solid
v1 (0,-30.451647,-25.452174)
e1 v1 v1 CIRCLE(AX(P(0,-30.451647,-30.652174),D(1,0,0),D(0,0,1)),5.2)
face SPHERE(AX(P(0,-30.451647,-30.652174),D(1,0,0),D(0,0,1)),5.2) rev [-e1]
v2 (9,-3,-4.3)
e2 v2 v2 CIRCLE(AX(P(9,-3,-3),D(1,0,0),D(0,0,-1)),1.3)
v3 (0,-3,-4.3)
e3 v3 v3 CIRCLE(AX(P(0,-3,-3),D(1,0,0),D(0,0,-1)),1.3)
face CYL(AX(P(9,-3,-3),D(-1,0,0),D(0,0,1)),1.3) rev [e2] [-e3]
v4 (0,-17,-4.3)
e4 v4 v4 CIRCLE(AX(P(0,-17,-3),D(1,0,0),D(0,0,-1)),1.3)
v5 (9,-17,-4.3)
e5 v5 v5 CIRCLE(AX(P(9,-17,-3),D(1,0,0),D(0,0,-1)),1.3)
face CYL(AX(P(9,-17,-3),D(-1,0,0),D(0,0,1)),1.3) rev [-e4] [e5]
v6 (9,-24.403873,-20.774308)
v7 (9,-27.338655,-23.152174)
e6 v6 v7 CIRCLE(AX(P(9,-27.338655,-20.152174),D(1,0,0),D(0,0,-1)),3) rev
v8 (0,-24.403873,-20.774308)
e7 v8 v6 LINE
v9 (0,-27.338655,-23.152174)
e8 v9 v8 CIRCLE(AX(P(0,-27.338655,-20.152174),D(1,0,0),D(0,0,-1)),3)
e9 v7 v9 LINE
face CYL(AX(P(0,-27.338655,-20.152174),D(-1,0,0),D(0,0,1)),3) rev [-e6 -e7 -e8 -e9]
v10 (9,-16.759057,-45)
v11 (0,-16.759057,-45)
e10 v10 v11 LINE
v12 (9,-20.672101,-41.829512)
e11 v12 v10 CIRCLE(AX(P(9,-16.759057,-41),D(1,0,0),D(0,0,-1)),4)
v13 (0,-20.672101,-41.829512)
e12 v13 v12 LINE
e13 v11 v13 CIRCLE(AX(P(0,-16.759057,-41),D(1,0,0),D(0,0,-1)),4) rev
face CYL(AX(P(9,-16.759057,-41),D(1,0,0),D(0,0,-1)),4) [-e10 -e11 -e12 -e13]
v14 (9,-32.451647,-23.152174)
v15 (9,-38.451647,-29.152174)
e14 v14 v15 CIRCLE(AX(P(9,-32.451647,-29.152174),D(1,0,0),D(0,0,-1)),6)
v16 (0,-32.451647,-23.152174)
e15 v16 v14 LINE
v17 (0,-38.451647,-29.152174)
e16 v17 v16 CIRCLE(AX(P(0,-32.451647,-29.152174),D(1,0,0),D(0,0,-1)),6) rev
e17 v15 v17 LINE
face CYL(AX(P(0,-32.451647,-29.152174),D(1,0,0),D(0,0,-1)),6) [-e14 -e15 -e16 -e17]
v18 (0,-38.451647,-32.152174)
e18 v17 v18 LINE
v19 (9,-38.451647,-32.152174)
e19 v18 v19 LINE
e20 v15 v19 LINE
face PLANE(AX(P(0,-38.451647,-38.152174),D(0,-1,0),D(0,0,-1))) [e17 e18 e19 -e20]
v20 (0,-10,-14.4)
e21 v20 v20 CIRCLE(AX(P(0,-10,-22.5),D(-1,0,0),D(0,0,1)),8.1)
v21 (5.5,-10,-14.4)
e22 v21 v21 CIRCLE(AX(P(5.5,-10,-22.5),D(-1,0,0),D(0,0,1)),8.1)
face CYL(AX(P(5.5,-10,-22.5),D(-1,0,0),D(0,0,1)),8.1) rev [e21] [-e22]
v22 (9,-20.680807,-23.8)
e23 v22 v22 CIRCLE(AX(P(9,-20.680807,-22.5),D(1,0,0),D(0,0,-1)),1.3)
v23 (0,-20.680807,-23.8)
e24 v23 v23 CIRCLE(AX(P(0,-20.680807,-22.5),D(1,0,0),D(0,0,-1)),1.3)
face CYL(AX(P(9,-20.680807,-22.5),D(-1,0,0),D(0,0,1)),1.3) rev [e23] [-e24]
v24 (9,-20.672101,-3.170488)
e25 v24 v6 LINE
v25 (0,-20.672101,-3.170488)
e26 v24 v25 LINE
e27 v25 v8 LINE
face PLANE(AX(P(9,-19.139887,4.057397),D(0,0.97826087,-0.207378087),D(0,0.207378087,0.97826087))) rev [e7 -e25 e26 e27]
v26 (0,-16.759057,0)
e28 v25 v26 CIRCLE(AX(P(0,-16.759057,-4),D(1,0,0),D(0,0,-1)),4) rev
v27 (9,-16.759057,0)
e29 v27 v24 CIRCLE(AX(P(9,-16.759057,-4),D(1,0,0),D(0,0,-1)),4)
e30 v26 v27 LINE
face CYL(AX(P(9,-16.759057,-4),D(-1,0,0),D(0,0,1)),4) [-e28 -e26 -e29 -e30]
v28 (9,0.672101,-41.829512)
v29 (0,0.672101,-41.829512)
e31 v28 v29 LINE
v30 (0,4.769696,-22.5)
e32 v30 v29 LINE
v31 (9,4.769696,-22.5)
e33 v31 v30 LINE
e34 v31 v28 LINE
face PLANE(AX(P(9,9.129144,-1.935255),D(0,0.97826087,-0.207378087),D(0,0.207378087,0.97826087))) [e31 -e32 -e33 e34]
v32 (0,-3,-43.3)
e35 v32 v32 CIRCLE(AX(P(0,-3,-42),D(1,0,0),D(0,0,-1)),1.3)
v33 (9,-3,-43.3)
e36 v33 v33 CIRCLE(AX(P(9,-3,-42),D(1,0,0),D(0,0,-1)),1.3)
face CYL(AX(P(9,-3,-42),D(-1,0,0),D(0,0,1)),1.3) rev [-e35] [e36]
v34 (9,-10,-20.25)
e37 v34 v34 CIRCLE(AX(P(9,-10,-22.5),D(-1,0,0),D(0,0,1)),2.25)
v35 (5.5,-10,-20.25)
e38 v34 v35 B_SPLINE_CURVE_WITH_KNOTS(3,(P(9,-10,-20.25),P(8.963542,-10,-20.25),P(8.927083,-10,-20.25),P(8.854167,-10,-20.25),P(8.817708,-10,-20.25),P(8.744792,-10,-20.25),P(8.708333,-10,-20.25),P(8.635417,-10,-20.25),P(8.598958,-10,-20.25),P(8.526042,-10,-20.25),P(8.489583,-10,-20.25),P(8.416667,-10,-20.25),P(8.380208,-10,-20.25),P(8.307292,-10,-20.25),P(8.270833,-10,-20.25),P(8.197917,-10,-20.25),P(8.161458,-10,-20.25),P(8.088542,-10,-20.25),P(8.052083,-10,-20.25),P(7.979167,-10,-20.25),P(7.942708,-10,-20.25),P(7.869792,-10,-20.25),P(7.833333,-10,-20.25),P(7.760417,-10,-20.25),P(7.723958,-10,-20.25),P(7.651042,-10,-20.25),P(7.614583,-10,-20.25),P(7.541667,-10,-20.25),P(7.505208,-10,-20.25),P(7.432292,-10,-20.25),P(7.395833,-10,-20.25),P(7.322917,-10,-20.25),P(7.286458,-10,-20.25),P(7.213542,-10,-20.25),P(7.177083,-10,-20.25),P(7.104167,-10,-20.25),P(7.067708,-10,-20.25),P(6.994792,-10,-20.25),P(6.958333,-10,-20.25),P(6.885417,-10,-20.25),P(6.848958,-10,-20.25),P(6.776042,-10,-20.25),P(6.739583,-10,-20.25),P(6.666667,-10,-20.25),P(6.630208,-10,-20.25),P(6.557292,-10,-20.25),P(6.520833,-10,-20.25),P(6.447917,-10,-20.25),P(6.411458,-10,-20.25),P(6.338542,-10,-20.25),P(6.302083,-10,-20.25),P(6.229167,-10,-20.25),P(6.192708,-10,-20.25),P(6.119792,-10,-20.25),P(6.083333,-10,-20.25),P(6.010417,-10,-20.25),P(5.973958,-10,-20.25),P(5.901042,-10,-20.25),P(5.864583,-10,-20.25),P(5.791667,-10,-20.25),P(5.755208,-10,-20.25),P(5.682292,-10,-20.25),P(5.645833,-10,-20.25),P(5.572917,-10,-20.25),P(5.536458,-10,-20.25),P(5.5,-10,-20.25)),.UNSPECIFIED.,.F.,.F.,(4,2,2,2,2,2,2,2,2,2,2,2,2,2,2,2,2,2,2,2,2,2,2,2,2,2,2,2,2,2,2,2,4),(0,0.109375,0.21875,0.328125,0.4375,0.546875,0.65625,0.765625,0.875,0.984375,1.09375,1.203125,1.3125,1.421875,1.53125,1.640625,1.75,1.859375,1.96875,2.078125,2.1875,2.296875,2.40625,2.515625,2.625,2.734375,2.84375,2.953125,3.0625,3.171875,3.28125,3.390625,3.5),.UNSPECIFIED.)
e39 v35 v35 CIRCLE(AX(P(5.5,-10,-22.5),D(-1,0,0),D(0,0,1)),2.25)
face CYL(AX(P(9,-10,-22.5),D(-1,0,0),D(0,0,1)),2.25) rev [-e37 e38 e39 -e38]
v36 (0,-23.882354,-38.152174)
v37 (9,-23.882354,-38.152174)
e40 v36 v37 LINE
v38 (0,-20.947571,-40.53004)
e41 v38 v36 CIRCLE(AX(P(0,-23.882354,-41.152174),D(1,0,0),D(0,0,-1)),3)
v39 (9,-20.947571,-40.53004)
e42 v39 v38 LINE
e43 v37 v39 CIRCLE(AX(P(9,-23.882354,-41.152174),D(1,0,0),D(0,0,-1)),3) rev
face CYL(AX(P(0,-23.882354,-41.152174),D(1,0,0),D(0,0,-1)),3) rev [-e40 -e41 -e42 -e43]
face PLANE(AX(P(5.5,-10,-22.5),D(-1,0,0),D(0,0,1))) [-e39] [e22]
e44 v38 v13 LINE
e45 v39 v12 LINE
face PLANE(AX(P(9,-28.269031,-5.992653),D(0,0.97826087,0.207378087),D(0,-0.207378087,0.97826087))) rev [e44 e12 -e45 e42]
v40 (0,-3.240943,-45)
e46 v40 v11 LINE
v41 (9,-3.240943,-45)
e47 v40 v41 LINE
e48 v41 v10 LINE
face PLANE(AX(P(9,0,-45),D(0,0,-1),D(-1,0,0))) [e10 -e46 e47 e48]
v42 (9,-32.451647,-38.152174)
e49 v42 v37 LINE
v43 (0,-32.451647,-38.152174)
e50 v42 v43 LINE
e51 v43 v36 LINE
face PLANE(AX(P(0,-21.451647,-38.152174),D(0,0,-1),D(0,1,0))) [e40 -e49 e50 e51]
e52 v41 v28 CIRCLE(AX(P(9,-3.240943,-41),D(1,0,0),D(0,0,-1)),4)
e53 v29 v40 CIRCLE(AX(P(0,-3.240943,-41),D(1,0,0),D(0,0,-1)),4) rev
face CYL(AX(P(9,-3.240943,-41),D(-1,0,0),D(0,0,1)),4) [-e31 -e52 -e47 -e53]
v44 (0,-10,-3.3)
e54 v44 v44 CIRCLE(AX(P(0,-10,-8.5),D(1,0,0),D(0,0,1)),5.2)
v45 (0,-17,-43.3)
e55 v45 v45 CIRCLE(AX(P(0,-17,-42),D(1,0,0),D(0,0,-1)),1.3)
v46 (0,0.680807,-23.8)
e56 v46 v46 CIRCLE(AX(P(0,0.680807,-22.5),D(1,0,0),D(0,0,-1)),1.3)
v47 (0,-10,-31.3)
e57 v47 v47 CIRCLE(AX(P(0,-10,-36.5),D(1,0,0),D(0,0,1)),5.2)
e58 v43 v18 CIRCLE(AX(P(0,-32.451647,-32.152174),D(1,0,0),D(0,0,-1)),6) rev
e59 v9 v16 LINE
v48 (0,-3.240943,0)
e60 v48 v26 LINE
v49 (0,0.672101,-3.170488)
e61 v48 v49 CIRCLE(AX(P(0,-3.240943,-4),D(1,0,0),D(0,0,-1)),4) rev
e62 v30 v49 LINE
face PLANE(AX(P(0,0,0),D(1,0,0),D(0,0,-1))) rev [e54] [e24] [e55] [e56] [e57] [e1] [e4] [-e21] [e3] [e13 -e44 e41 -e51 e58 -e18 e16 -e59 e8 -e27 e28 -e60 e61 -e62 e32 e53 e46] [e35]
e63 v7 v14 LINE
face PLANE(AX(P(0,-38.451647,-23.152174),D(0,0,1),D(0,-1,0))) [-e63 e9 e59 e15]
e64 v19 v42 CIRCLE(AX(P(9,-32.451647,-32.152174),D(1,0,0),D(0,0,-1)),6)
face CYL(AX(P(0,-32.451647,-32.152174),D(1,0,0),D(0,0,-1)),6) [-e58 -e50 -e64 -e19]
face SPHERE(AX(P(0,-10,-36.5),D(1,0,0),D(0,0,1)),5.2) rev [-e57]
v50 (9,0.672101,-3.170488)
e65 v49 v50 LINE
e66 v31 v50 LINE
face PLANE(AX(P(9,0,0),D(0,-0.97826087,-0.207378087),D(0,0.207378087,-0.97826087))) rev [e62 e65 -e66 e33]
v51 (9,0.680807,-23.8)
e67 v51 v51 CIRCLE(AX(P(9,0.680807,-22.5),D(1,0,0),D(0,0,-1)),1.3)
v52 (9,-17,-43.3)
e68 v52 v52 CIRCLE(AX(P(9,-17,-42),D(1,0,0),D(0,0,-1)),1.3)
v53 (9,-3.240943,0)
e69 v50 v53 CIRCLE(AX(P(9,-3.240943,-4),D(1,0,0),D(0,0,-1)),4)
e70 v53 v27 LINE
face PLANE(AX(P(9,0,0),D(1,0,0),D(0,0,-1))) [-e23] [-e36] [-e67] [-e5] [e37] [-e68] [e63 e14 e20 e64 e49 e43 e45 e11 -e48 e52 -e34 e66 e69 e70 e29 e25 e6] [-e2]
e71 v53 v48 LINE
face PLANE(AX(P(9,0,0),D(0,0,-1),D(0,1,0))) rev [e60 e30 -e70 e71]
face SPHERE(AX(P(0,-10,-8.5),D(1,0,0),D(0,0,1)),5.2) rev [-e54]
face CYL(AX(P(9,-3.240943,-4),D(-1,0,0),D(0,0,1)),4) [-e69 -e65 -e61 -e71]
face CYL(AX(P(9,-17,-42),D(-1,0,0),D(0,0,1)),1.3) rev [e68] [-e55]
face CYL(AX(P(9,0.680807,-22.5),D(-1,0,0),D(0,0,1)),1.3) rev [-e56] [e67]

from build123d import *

# Parameters (mm, degrees)
SKETCH1_R           = 1.3
BOSS_EXTRUDE1_DEPTH = 9
CUT_REVOLVE3_ANGLE  = 180
SKETCH8_R           = 8.1
CUT_EXTRUDE4_DEPTH  = 5.5
SKETCH9_R           = 2.25
CUT_EXTRUDE5_DEPTH  = 52.660312042
BOSS_EXTRUDE7_DEPTH = 9
CUT_REVOLVE4_ANGLE  = 180
FILLET1_R           = 6
FILLET2_R           = 4
FILLET3_R           = 3
FILLET4_R           = 3


with BuildPart() as part:
    # Sketch1 → Boss-Extrude1 (new body)
    with BuildSketch(Plane(origin=(0, 0, 0), x_dir=(0, 0, -1), z_dir=(1, 0, 0))):
        Polygon((0, -20), (22.5, -24.769696007), (45, -20), (45, 0), (22.5, 4.769696007), (0, 0), align=None)
        with Locations((22.5, -20.680807118)):
            Circle(SKETCH1_R, mode=Mode.SUBTRACT)
        with Locations((22.5, 0.680807118)):
            Circle(SKETCH1_R, mode=Mode.SUBTRACT)
        with Locations((42, -17)):
            Circle(SKETCH1_R, mode=Mode.SUBTRACT)
        with Locations((3, -17)):
            Circle(SKETCH1_R, mode=Mode.SUBTRACT)
        with Locations((3, -3)):
            Circle(SKETCH1_R, mode=Mode.SUBTRACT)
        with Locations((42, -3)):
            Circle(SKETCH1_R, mode=Mode.SUBTRACT)
    extrude(amount=BOSS_EXTRUDE1_DEPTH)

    # Sketch7 → Cut-Revolve3 (revolve, cut)
    with BuildSketch(Plane.ZY):
        with BuildLine():
            Line((-41.7, -10), (-31.3, -10))
            ThreePointArc((-31.3, -10), (-36.5, -4.8), (-41.7, -10))
        make_face()
        with BuildLine():
            Line((-13.7, -10), (-3.3, -10))
            ThreePointArc((-3.3, -10), (-8.5, -4.8), (-13.7, -10))
        make_face()
    revolve(axis=Axis((0, -10, -41.7), (0, 0, -1)), revolution_arc=CUT_REVOLVE3_ANGLE, mode=Mode.SUBTRACT)

    # Sketch8 → Cut-Extrude4 (cut)
    with BuildSketch(Plane.ZY):
        with Locations((-22.5, -10)):
            Circle(SKETCH8_R)
    extrude(amount=-CUT_EXTRUDE4_DEPTH, mode=Mode.SUBTRACT)

    # Sketch9 → Cut-Extrude5 (cut, through all)
    with BuildSketch(Plane.ZY.offset(-5.5)):
        with Locations((-22.5, -10)):
            Circle(SKETCH9_R)
    extrude(amount=-CUT_EXTRUDE5_DEPTH, mode=Mode.SUBTRACT)

    # Sketch16 → Boss-Extrude7 (add)
    with BuildSketch(Plane(origin=(9, 0, 0), x_dir=(0, 0, -1), z_dir=(1, 0, 0))):
        Polygon((38.152173913, -21.451646611), (38.152173913, -38.451646611), (23.152173913, -38.451646611), (23.152173913, -24.631443949), align=None)
    extrude(amount=-BOSS_EXTRUDE7_DEPTH)

    # Sketch17 → Cut-Revolve4 (revolve, cut)
    with BuildSketch(Plane.ZY):
        with BuildLine():
            Line((-25.452173913, -30.451646611), (-35.852173913, -30.451646611))
            ThreePointArc((-35.852173913, -30.451646611), (-30.652173913, -25.251646611), (-25.452173913, -30.451646611))
        make_face()
    revolve(axis=Axis((0, -30.451646611, -25.452173913), (0, 0, -1)), revolution_arc=CUT_REVOLVE4_ANGLE, mode=Mode.SUBTRACT)

    # Fillet1
    fillet1_edges = [part.edges().sort_by_distance(p)[0] for p in [
        (4.5, -38.451646611, -38.152173913),
        (4.5, -38.451646611, -23.152173913),
    ]]
    fillet(fillet1_edges, radius=FILLET1_R)

    # Fillet2
    fillet2_edges = [part.edges().sort_by_distance(p)[0] for p in [
        (4.5, -20, -45),
        (4.5, -20, 0),
        (4.5, 0, 0),
        (4.5, 0, -45),
    ]]
    fillet(fillet2_edges, radius=FILLET2_R)

    # Fillet3
    # the kernel refuses this fillet: 3 mm, written as the material it adds along each edge
    with BuildSketch(Plane(origin=(9, -24.631443949, -23.152173913), x_dir=(0, -0.20737808726534282, 0.9782608695650501), z_dir=(-1, 0, 0))) as fillet3_piece_1:
        with BuildLine():
            CenterArc((3.350740319, -1.340055458), FILLET3_R, 153.468795145, 38.499950409)
            Line((0.41595771, -1.96218972), (0.357262058, -1.974632405))
            Line((0.357262058, -1.974632405), (-0.058695652, -0.012442685))
            Line((-0.058695652, -0.012442685), (0, 0.06))
            ThreePointArc((0, 0.06), (0.333333333, 0.06), (0.612985194, 0.026801109))
            Line((0.612985194, 0.026801109), (0.666666667, 0))
        make_face()
    extrude(amount=9)
    with BuildSketch(Plane(origin=(9, -21.451646611, -38.152173913), x_dir=(0, -1, 0), z_dir=(-1, 0, 0))) as fillet3_piece_2:
        with BuildLine():
            CenterArc((FILLET3_R * 0.810235733018, -FILLET3_R), FILLET3_R, 90, 78.031254445)
            Line((-FILLET3_R * 0.168025136547, -FILLET3_R * 0.792621912735), (-FILLET3_R * 0.187590353938, -FILLET3_R * 0.78847435099))
            Line((-FILLET3_R * 0.187590353938, -FILLET3_R * 0.78847435099), (-FILLET3_R * 0.0162047146604, FILLET3_R * 0.02))
            Line((-FILLET3_R * 0.0162047146604, FILLET3_R * 0.02), (FILLET3_R * 0.810235733018, FILLET3_R * 0.02))
            Line((FILLET3_R * 0.810235733018, FILLET3_R * 0.02), (FILLET3_R * 0.810235733018, 0))
        make_face()
    extrude(amount=9)

    # Fillet4
    fillet4_edges = [part.edges().sort_by_distance(p)[0] for p in [
        (4.5, -24.769696007, -22.5),
    ]]
    fillet(fillet4_edges, radius=FILLET4_R)


solid = part.part
